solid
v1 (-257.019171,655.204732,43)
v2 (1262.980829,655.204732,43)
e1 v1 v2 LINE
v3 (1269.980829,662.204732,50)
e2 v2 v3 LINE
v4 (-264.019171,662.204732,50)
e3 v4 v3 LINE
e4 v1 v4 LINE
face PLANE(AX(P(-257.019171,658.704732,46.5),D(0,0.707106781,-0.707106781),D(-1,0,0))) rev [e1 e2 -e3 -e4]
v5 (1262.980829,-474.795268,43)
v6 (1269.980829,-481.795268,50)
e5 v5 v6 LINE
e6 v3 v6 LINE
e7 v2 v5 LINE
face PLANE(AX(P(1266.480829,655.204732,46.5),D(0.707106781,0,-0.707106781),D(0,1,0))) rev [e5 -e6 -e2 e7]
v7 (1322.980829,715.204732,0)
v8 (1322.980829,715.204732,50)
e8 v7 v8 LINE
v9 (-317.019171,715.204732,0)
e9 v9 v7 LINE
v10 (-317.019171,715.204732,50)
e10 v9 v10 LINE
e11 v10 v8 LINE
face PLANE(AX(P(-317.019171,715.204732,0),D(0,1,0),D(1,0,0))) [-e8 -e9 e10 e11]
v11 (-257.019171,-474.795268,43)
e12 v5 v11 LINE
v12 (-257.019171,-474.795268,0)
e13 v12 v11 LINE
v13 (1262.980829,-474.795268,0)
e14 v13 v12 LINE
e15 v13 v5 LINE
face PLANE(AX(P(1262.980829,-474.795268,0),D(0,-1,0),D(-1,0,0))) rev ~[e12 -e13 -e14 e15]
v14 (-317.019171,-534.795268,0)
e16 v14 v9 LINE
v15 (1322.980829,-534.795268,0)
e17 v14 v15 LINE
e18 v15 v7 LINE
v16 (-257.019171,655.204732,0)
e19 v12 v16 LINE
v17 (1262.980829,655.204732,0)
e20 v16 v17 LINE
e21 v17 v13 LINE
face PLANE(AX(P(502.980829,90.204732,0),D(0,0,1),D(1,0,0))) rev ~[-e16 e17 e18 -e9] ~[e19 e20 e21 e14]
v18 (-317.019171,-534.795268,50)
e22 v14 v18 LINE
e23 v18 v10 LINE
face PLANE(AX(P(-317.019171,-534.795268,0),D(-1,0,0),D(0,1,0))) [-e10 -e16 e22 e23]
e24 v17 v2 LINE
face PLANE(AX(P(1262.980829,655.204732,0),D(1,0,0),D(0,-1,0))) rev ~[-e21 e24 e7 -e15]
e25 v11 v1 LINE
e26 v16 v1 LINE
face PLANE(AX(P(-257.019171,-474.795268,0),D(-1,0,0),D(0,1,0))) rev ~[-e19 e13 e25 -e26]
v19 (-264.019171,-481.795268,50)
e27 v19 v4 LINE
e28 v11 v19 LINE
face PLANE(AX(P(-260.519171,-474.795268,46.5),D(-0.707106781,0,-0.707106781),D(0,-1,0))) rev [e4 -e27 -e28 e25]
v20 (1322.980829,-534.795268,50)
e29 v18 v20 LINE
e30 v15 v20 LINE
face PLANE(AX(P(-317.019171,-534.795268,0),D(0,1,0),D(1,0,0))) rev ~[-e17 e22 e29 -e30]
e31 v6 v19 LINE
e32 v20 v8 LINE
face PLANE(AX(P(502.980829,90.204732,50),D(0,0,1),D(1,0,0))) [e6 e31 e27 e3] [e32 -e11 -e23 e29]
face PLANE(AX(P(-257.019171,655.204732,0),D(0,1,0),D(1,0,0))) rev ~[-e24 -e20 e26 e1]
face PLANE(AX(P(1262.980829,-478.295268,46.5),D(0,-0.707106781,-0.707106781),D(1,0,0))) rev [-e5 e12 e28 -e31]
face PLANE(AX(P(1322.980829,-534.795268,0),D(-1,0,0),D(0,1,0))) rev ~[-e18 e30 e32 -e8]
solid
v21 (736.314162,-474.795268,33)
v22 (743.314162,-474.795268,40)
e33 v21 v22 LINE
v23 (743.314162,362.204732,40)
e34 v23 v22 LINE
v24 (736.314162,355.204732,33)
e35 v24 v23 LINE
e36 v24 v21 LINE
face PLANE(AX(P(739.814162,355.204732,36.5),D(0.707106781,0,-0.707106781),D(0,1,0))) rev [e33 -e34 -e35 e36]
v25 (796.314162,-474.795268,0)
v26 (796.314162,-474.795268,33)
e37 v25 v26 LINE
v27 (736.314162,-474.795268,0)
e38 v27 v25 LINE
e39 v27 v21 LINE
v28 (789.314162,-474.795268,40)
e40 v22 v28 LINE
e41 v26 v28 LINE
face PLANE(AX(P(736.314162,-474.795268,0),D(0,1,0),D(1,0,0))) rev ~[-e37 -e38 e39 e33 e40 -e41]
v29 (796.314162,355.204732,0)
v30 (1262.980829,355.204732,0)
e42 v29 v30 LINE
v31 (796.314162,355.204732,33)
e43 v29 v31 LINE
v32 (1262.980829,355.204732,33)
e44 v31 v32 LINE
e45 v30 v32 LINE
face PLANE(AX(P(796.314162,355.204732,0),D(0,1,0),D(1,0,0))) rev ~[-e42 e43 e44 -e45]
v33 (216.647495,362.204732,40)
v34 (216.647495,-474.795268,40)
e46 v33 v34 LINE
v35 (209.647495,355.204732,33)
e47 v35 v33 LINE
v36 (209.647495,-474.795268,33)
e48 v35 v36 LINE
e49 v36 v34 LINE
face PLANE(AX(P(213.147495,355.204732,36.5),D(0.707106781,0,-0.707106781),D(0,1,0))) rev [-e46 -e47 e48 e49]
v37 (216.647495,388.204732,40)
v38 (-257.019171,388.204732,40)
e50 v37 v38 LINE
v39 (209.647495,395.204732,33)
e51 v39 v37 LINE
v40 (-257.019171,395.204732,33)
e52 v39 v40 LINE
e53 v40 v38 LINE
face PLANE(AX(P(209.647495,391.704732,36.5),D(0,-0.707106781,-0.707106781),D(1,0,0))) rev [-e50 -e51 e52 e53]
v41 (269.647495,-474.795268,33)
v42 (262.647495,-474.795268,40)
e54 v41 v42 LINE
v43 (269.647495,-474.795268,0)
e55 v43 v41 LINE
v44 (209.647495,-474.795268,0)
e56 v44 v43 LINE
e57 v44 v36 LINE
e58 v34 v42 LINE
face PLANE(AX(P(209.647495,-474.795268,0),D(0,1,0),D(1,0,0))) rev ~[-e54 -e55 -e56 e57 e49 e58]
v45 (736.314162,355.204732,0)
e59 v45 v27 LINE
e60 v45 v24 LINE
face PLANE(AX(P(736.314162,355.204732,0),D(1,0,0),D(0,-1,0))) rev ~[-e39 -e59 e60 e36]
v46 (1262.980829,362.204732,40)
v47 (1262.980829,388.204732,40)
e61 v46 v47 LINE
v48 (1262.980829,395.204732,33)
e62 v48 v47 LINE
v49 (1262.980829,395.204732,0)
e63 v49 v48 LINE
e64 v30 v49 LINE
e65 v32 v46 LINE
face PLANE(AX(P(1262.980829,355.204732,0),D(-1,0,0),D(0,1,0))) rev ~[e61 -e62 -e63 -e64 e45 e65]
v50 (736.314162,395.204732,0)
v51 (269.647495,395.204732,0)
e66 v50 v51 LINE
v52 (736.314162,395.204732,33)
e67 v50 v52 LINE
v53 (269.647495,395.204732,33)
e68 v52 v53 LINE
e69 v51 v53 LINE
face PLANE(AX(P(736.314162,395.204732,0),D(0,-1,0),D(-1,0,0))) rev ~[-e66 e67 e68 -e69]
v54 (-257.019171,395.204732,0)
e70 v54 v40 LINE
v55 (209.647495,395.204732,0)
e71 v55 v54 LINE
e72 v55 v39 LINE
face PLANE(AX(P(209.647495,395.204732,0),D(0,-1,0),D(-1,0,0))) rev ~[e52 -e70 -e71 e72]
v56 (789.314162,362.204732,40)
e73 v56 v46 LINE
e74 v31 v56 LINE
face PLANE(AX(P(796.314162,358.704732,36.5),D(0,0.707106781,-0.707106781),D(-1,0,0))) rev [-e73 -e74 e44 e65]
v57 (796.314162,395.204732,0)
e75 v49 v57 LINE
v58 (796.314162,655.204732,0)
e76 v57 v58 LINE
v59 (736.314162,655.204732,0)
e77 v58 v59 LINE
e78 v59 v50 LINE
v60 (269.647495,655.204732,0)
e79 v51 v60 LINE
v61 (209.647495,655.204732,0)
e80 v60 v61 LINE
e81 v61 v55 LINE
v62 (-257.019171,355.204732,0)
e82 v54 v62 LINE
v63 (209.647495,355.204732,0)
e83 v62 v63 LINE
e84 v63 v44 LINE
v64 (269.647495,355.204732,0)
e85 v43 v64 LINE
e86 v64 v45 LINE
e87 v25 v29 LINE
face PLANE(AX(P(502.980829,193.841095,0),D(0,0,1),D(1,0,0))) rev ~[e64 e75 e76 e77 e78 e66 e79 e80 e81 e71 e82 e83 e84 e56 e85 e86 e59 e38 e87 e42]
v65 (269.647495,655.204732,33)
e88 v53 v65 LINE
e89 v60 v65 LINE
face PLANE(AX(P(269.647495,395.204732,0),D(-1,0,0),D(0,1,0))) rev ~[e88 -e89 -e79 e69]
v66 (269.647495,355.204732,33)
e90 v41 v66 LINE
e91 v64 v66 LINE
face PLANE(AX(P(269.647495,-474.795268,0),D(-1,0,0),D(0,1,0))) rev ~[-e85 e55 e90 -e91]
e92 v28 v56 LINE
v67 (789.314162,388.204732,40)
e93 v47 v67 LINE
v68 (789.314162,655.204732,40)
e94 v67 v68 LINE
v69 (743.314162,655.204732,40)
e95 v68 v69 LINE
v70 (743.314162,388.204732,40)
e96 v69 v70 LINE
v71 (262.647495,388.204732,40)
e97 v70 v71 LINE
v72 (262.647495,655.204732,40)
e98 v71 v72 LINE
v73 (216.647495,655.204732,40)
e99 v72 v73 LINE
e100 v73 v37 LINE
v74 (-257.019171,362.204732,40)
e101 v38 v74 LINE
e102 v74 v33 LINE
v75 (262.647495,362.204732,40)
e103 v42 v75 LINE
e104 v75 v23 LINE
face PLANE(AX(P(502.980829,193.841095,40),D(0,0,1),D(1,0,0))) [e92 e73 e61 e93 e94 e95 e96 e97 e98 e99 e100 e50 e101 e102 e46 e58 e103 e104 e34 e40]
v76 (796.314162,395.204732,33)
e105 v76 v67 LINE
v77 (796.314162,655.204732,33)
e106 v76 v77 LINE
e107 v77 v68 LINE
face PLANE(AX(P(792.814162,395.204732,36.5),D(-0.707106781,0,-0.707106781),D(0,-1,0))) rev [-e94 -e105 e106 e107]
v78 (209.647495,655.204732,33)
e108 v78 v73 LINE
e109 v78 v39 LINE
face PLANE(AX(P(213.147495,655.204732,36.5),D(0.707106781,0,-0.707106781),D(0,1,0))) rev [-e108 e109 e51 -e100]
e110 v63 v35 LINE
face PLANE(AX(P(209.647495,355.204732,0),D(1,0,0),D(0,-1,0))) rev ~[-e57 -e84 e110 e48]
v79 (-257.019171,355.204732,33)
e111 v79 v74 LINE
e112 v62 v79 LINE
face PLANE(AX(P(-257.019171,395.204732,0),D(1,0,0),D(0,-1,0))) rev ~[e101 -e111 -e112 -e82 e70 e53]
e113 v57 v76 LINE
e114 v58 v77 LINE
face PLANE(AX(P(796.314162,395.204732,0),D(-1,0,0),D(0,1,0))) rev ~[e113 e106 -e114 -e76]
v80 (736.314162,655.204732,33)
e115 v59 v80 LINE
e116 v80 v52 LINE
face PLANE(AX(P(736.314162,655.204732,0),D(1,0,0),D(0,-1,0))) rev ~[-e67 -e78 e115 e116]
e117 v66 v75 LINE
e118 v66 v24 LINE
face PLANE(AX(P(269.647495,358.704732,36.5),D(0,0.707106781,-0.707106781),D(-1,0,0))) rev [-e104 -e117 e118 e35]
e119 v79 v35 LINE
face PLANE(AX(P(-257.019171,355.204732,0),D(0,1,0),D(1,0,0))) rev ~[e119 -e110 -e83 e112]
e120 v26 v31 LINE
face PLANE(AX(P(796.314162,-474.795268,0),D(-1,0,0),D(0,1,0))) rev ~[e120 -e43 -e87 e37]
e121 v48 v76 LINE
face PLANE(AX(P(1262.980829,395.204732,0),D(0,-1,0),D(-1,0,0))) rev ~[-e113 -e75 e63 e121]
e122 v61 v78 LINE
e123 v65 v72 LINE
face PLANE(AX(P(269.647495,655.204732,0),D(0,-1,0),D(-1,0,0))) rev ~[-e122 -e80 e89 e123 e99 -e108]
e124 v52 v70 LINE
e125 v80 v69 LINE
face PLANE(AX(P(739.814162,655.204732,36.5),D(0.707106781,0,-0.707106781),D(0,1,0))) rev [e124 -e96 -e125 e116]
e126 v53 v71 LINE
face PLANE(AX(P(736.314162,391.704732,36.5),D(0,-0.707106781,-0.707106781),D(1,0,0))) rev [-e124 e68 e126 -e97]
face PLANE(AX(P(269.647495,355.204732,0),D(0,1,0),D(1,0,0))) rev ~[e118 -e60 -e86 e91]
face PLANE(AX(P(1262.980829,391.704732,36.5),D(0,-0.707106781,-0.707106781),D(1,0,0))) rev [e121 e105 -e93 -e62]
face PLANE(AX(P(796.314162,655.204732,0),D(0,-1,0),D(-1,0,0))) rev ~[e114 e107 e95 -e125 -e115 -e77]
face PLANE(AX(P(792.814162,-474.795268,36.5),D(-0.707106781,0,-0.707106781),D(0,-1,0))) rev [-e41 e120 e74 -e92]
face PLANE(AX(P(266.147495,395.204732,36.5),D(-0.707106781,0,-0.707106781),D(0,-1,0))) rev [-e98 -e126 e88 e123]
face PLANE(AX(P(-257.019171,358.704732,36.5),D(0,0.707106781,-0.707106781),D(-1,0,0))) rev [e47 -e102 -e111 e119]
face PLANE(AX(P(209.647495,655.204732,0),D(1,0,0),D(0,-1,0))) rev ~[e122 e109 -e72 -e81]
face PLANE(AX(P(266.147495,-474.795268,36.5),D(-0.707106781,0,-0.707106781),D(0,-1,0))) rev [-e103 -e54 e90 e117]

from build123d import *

# Parameters (mm, degrees)
F0_W      = 1640
F0_H      = 1250
F1_DEPTH  = 50
F2_DEPTH  = 40
F3_SIZE   = 7
F3_2_SIZE = 7


# Not quite as in the source:
# - a feature names something its author has since deleted; it is built from what else it names


with BuildPart() as f1:
    # F0 (on Top) → F1 (new body)
    with BuildSketch(Plane.XY):
        with Locations((502.9808287794, 90.2047318473)):
            Rectangle(F0_W, F0_H)
        Polygon((-257.0191712206, 395.2047318473), (-257.0191712206, 655.2047318473), (209.6474954461, 655.2047318473), (269.6474954461, 655.2047318473), (736.3141621128, 655.2047318473), (796.3141621128, 655.2047318473), (1262.9808287794, 655.2047318473), (1262.9808287794, 395.2047318473), (1262.9808287794, 355.2047318473), (1262.9808287794, -474.7952681527), (796.3141621128, -474.7952681527), (736.3141621128, -474.7952681527), (269.6474954461, -474.7952681527), (209.6474954461, -474.7952681527), (-257.0191712206, -474.7952681527), (-257.0191712206, 355.2047318473), align=None, mode=Mode.SUBTRACT)
    extrude(amount=F1_DEPTH)

    # F3
    f3_edges = [f1.edges().sort_by_distance(p)[0] for p in [
        (-257.019171, 90.204732, 50),
        (502.980829, 655.204732, 50),
        (502.980829, -474.795268, 50),
        (1262.980829, 90.204732, 50),
    ]]
    chamfer(f3_edges, length=F3_SIZE)


with BuildPart() as f2:
    # F0 (on Top) → F2 (new body)
    with BuildSketch(Plane.XY):
        Polygon((269.6474954461, 655.2047318473), (209.6474954461, 655.2047318473), (209.6474954461, 395.2047318473), (-257.0191712206, 395.2047318473), (-257.0191712206, 355.2047318473), (209.6474954461, 355.2047318473), (209.6474954461, -474.7952681527), (269.6474954461, -474.7952681527), (269.6474954461, 355.2047318473), (736.3141621128, 355.2047318473), (736.3141621128, -474.7952681527), (796.3141621128, -474.7952681527), (796.3141621128, 355.2047318473), (1262.9808287794, 355.2047318473), (1262.9808287794, 395.2047318473), (796.3141621128, 395.2047318473), (796.3141621128, 655.2047318473), (736.3141621128, 655.2047318473), (736.3141621128, 395.2047318473), (269.6474954461, 395.2047318473), align=None)
    extrude(amount=F2_DEPTH)

    # F3#2
    f3_2_edges = [f2.edges().sort_by_distance(p)[0] for p in [
        (-23.685838, 355.204732, 40),
        (502.980829, 355.204732, 40),
        (269.647495, -59.795268, 40),
        (796.314162, -59.795268, 40),
        (796.314162, 525.204732, 40),
        (269.647495, 525.204732, 40),
        (209.647495, -59.795268, 40),
        (209.647495, 525.204732, 40),
        (-23.685838, 395.204732, 40),
        (502.980829, 395.204732, 40),
        (1029.647495, 395.204732, 40),
        (1029.647495, 355.204732, 40),
        (736.314162, -59.795268, 40),
        (736.314162, 525.204732, 40),
    ]]
    chamfer(f3_2_edges, length=F3_2_SIZE)


solid = Compound([f1.part, f2.part])
